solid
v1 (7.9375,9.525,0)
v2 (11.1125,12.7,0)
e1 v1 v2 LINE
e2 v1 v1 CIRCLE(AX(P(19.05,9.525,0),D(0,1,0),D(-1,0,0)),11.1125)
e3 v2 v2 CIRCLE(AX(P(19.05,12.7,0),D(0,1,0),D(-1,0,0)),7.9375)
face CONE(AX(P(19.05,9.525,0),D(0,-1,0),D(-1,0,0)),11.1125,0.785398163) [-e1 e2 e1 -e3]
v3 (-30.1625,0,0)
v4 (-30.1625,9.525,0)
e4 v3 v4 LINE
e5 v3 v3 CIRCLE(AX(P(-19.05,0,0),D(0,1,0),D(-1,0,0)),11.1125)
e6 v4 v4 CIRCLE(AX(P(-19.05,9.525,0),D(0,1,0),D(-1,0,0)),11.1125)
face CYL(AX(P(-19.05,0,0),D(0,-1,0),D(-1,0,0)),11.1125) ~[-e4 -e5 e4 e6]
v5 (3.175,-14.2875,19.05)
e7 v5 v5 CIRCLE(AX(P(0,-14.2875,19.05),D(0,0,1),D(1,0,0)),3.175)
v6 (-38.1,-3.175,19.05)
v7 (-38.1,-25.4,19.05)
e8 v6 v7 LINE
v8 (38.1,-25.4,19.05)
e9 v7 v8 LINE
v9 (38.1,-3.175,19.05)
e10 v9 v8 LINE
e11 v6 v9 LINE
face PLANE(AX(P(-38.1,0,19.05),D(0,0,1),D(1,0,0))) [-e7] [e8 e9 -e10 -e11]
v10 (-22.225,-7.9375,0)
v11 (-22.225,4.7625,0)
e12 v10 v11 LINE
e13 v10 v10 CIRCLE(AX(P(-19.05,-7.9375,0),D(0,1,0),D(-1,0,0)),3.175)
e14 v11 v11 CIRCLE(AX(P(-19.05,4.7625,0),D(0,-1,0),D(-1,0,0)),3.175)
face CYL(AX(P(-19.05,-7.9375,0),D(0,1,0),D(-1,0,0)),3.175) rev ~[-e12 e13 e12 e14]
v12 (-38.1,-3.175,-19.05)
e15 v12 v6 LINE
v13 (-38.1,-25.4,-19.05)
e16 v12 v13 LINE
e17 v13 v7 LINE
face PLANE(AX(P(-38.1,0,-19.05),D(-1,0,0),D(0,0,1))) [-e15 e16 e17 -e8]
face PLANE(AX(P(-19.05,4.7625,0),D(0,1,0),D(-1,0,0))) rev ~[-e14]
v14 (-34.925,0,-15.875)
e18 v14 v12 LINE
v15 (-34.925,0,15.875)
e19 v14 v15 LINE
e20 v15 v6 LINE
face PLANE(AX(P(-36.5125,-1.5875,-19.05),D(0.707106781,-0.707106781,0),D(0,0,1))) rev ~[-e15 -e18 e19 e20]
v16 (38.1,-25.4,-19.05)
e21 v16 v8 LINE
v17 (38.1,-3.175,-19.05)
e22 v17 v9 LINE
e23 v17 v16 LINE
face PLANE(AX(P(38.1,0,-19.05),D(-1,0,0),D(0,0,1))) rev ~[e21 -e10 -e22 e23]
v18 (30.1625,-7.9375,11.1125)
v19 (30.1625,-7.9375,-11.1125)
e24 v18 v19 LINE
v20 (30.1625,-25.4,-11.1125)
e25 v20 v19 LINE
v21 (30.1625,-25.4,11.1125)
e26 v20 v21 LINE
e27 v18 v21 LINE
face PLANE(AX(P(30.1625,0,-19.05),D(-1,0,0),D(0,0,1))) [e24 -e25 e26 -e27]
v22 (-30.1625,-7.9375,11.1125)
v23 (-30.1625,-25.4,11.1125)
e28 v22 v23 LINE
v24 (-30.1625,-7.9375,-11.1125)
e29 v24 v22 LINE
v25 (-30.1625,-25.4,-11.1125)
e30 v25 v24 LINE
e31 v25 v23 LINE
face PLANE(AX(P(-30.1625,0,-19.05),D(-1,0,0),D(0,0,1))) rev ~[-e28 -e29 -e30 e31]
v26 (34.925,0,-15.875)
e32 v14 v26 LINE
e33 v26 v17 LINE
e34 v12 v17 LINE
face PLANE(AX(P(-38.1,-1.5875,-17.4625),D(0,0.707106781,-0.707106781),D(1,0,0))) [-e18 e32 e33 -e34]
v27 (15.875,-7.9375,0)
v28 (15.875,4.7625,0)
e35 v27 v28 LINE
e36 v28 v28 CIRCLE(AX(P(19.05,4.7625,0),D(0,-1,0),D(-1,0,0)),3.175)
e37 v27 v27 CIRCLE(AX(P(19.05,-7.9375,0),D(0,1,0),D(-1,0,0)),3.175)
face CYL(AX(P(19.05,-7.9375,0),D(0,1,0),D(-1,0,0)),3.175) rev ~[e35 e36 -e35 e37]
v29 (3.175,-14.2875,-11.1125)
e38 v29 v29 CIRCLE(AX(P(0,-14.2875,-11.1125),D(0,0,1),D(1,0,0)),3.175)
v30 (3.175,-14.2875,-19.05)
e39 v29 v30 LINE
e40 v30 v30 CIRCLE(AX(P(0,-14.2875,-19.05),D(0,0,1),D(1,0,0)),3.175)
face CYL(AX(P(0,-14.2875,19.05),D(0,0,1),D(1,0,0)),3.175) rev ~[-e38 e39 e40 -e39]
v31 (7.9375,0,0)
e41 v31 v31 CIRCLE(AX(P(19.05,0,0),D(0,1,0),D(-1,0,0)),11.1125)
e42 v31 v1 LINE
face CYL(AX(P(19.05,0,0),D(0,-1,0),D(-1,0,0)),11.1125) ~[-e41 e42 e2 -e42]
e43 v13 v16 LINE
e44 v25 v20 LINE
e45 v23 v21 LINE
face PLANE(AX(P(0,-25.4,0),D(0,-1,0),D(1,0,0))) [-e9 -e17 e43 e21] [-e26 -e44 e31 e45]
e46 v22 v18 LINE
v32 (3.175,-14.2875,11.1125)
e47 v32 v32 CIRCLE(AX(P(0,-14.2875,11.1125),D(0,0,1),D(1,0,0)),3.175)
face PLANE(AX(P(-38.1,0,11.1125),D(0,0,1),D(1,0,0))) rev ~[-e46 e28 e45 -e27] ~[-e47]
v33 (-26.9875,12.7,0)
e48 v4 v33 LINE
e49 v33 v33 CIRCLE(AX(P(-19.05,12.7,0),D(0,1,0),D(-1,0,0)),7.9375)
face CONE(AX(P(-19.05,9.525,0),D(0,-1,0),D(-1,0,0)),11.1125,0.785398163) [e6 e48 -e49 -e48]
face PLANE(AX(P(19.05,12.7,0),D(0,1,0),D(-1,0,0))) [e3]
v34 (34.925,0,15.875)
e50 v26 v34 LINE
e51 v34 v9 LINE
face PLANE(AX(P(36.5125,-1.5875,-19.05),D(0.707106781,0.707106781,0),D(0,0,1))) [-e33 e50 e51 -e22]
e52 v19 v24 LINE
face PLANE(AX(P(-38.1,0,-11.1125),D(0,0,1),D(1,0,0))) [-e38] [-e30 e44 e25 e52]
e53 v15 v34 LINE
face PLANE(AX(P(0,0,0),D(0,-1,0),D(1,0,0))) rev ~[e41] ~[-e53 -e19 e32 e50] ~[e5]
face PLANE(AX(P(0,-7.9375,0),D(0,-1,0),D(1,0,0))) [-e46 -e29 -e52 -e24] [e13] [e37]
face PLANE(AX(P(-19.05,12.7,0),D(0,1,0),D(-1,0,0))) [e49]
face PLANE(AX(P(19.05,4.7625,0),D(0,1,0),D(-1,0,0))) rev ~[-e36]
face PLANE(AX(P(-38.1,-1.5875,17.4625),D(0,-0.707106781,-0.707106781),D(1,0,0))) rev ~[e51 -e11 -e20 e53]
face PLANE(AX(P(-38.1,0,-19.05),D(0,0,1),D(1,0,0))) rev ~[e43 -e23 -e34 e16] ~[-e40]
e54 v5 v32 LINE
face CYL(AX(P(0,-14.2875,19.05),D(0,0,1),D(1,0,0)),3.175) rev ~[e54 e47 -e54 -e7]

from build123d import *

# Parameters (mm, degrees)
F0_W     = 76.2
F0_H     = 38.1
F1_DEPTH = 25.4
F2_R     = 11.1125
F3_DEPTH = 12.7
F4_SIZE2 = 3.175
F4_SIZE  = 3.175
F5_SIZE2 = 3.175
F5_SIZE  = 3.175
F6_T     = 7.9375
F7_R     = 3.175
F8_DEPTH = 38.1


# Not quite as in the source:
# - a shell that OpenCascade refuses in one call is made with other operations: the cavity is built on its own and cut out


with BuildPart() as f1:
    # F0 (on Front) → F1 (new body)
    with BuildSketch(Plane.XZ):
        Rectangle(F0_W, F0_H)
    extrude(amount=F1_DEPTH)

    # F2 (on face) → F3 (join)
    with BuildSketch(Plane(origin=(0, 0, 0), x_dir=(-1, 0, 0), z_dir=(0, 1, 0))):
        with Locations((-19.05, 0)):
            Circle(F2_R)
        with Locations((19.05, 0)):
            Circle(F2_R)
    extrude(amount=F3_DEPTH)

    # F4
    f4_edges = [f1.edges().sort_by_distance(p)[0] for p in [
        (30.1625, 12.7, 0),
        (-7.9375, 12.7, 0),
    ]]
    chamfer(f4_edges, length=F4_SIZE, length2=F4_SIZE2)

    # F5
    f5_edges = [f1.edges().sort_by_distance(p)[0] for p in [
        (0, 0, 19.05),
        (38.1, 0, 0),
        (0, 0, -19.05),
        (-38.1, 0, 0),
    ]]
    chamfer(f5_edges, length=F5_SIZE, length2=F5_SIZE2)

    # F6: shell of thickness 7.9375, made by hand


with BuildPart() as f6_core1:
    # F6_t2: copy of F1
    add(f1.part)

    # the walls: a layer under each face that stays
    f6_faces = [f6_core1.faces().sort_by_distance(p)[0] for p in [
        (0, 0, 0),
        (0, -1.5875, 17.4625),
        (36.5125, -1.5875, 0),
        (-36.5125, -1.5875, 0),
        (0, -1.5875, -17.4625),
        (-7.9375, 4.7625, 0),
        (30.1625, 4.7625, 0),
        (0, -14.2875, 19.05),
        (38.1, -14.2875, 0),
        (-38.1, -14.2875, 0),
        (0, -14.2875, -19.05),
        (-9.525, 11.1125, 0),
        (28.575, 11.1125, 0),
        (-19.05, 12.7, 0),
        (19.05, 12.7, 0),
    ]]
    thicken(f6_faces, amount=-F6_T, mode=Mode.SUBTRACT)

    # F6_s3 → F6_t4 (revolve, cut)
    with BuildSketch(Plane.XY):
        Polygon((-30.241875, 0.079375), (-30.1625, -7.9375), (-22.225, -7.9375), (-22.225, 0), align=None)
    revolve(axis=Axis((-19.05, 0, 0), (0, 1, 0)), mode=Mode.SUBTRACT)

    # F6_s5 → F6_t6 (revolve, cut)
    with BuildSketch(Plane.XY):
        Polygon((7.858125, 0.079375), (7.9375, -7.9375), (15.875, -7.9375), (15.875, 0), align=None)
    revolve(axis=Axis((19.05, 0, 0), (0, 1, 0)), mode=Mode.SUBTRACT)


with BuildPart() as f1_1:
    add(f1.part)

    # what is left inside the walls is the cavity
    f6_cavity = [f6_core1.part.solids().sort_by_distance(p)[0] for p in [
        (0, -25.320625, -3.704167),
    ]]
    add(f6_cavity, mode=Mode.SUBTRACT)

    # F7 (on face) → F8 (cut)
    with BuildSketch(Plane.XY.offset(19.05)):
        with Locations((0, -14.2875)):
            Circle(F7_R)
    extrude(amount=-F8_DEPTH, mode=Mode.SUBTRACT)


solid = f1_1.part
